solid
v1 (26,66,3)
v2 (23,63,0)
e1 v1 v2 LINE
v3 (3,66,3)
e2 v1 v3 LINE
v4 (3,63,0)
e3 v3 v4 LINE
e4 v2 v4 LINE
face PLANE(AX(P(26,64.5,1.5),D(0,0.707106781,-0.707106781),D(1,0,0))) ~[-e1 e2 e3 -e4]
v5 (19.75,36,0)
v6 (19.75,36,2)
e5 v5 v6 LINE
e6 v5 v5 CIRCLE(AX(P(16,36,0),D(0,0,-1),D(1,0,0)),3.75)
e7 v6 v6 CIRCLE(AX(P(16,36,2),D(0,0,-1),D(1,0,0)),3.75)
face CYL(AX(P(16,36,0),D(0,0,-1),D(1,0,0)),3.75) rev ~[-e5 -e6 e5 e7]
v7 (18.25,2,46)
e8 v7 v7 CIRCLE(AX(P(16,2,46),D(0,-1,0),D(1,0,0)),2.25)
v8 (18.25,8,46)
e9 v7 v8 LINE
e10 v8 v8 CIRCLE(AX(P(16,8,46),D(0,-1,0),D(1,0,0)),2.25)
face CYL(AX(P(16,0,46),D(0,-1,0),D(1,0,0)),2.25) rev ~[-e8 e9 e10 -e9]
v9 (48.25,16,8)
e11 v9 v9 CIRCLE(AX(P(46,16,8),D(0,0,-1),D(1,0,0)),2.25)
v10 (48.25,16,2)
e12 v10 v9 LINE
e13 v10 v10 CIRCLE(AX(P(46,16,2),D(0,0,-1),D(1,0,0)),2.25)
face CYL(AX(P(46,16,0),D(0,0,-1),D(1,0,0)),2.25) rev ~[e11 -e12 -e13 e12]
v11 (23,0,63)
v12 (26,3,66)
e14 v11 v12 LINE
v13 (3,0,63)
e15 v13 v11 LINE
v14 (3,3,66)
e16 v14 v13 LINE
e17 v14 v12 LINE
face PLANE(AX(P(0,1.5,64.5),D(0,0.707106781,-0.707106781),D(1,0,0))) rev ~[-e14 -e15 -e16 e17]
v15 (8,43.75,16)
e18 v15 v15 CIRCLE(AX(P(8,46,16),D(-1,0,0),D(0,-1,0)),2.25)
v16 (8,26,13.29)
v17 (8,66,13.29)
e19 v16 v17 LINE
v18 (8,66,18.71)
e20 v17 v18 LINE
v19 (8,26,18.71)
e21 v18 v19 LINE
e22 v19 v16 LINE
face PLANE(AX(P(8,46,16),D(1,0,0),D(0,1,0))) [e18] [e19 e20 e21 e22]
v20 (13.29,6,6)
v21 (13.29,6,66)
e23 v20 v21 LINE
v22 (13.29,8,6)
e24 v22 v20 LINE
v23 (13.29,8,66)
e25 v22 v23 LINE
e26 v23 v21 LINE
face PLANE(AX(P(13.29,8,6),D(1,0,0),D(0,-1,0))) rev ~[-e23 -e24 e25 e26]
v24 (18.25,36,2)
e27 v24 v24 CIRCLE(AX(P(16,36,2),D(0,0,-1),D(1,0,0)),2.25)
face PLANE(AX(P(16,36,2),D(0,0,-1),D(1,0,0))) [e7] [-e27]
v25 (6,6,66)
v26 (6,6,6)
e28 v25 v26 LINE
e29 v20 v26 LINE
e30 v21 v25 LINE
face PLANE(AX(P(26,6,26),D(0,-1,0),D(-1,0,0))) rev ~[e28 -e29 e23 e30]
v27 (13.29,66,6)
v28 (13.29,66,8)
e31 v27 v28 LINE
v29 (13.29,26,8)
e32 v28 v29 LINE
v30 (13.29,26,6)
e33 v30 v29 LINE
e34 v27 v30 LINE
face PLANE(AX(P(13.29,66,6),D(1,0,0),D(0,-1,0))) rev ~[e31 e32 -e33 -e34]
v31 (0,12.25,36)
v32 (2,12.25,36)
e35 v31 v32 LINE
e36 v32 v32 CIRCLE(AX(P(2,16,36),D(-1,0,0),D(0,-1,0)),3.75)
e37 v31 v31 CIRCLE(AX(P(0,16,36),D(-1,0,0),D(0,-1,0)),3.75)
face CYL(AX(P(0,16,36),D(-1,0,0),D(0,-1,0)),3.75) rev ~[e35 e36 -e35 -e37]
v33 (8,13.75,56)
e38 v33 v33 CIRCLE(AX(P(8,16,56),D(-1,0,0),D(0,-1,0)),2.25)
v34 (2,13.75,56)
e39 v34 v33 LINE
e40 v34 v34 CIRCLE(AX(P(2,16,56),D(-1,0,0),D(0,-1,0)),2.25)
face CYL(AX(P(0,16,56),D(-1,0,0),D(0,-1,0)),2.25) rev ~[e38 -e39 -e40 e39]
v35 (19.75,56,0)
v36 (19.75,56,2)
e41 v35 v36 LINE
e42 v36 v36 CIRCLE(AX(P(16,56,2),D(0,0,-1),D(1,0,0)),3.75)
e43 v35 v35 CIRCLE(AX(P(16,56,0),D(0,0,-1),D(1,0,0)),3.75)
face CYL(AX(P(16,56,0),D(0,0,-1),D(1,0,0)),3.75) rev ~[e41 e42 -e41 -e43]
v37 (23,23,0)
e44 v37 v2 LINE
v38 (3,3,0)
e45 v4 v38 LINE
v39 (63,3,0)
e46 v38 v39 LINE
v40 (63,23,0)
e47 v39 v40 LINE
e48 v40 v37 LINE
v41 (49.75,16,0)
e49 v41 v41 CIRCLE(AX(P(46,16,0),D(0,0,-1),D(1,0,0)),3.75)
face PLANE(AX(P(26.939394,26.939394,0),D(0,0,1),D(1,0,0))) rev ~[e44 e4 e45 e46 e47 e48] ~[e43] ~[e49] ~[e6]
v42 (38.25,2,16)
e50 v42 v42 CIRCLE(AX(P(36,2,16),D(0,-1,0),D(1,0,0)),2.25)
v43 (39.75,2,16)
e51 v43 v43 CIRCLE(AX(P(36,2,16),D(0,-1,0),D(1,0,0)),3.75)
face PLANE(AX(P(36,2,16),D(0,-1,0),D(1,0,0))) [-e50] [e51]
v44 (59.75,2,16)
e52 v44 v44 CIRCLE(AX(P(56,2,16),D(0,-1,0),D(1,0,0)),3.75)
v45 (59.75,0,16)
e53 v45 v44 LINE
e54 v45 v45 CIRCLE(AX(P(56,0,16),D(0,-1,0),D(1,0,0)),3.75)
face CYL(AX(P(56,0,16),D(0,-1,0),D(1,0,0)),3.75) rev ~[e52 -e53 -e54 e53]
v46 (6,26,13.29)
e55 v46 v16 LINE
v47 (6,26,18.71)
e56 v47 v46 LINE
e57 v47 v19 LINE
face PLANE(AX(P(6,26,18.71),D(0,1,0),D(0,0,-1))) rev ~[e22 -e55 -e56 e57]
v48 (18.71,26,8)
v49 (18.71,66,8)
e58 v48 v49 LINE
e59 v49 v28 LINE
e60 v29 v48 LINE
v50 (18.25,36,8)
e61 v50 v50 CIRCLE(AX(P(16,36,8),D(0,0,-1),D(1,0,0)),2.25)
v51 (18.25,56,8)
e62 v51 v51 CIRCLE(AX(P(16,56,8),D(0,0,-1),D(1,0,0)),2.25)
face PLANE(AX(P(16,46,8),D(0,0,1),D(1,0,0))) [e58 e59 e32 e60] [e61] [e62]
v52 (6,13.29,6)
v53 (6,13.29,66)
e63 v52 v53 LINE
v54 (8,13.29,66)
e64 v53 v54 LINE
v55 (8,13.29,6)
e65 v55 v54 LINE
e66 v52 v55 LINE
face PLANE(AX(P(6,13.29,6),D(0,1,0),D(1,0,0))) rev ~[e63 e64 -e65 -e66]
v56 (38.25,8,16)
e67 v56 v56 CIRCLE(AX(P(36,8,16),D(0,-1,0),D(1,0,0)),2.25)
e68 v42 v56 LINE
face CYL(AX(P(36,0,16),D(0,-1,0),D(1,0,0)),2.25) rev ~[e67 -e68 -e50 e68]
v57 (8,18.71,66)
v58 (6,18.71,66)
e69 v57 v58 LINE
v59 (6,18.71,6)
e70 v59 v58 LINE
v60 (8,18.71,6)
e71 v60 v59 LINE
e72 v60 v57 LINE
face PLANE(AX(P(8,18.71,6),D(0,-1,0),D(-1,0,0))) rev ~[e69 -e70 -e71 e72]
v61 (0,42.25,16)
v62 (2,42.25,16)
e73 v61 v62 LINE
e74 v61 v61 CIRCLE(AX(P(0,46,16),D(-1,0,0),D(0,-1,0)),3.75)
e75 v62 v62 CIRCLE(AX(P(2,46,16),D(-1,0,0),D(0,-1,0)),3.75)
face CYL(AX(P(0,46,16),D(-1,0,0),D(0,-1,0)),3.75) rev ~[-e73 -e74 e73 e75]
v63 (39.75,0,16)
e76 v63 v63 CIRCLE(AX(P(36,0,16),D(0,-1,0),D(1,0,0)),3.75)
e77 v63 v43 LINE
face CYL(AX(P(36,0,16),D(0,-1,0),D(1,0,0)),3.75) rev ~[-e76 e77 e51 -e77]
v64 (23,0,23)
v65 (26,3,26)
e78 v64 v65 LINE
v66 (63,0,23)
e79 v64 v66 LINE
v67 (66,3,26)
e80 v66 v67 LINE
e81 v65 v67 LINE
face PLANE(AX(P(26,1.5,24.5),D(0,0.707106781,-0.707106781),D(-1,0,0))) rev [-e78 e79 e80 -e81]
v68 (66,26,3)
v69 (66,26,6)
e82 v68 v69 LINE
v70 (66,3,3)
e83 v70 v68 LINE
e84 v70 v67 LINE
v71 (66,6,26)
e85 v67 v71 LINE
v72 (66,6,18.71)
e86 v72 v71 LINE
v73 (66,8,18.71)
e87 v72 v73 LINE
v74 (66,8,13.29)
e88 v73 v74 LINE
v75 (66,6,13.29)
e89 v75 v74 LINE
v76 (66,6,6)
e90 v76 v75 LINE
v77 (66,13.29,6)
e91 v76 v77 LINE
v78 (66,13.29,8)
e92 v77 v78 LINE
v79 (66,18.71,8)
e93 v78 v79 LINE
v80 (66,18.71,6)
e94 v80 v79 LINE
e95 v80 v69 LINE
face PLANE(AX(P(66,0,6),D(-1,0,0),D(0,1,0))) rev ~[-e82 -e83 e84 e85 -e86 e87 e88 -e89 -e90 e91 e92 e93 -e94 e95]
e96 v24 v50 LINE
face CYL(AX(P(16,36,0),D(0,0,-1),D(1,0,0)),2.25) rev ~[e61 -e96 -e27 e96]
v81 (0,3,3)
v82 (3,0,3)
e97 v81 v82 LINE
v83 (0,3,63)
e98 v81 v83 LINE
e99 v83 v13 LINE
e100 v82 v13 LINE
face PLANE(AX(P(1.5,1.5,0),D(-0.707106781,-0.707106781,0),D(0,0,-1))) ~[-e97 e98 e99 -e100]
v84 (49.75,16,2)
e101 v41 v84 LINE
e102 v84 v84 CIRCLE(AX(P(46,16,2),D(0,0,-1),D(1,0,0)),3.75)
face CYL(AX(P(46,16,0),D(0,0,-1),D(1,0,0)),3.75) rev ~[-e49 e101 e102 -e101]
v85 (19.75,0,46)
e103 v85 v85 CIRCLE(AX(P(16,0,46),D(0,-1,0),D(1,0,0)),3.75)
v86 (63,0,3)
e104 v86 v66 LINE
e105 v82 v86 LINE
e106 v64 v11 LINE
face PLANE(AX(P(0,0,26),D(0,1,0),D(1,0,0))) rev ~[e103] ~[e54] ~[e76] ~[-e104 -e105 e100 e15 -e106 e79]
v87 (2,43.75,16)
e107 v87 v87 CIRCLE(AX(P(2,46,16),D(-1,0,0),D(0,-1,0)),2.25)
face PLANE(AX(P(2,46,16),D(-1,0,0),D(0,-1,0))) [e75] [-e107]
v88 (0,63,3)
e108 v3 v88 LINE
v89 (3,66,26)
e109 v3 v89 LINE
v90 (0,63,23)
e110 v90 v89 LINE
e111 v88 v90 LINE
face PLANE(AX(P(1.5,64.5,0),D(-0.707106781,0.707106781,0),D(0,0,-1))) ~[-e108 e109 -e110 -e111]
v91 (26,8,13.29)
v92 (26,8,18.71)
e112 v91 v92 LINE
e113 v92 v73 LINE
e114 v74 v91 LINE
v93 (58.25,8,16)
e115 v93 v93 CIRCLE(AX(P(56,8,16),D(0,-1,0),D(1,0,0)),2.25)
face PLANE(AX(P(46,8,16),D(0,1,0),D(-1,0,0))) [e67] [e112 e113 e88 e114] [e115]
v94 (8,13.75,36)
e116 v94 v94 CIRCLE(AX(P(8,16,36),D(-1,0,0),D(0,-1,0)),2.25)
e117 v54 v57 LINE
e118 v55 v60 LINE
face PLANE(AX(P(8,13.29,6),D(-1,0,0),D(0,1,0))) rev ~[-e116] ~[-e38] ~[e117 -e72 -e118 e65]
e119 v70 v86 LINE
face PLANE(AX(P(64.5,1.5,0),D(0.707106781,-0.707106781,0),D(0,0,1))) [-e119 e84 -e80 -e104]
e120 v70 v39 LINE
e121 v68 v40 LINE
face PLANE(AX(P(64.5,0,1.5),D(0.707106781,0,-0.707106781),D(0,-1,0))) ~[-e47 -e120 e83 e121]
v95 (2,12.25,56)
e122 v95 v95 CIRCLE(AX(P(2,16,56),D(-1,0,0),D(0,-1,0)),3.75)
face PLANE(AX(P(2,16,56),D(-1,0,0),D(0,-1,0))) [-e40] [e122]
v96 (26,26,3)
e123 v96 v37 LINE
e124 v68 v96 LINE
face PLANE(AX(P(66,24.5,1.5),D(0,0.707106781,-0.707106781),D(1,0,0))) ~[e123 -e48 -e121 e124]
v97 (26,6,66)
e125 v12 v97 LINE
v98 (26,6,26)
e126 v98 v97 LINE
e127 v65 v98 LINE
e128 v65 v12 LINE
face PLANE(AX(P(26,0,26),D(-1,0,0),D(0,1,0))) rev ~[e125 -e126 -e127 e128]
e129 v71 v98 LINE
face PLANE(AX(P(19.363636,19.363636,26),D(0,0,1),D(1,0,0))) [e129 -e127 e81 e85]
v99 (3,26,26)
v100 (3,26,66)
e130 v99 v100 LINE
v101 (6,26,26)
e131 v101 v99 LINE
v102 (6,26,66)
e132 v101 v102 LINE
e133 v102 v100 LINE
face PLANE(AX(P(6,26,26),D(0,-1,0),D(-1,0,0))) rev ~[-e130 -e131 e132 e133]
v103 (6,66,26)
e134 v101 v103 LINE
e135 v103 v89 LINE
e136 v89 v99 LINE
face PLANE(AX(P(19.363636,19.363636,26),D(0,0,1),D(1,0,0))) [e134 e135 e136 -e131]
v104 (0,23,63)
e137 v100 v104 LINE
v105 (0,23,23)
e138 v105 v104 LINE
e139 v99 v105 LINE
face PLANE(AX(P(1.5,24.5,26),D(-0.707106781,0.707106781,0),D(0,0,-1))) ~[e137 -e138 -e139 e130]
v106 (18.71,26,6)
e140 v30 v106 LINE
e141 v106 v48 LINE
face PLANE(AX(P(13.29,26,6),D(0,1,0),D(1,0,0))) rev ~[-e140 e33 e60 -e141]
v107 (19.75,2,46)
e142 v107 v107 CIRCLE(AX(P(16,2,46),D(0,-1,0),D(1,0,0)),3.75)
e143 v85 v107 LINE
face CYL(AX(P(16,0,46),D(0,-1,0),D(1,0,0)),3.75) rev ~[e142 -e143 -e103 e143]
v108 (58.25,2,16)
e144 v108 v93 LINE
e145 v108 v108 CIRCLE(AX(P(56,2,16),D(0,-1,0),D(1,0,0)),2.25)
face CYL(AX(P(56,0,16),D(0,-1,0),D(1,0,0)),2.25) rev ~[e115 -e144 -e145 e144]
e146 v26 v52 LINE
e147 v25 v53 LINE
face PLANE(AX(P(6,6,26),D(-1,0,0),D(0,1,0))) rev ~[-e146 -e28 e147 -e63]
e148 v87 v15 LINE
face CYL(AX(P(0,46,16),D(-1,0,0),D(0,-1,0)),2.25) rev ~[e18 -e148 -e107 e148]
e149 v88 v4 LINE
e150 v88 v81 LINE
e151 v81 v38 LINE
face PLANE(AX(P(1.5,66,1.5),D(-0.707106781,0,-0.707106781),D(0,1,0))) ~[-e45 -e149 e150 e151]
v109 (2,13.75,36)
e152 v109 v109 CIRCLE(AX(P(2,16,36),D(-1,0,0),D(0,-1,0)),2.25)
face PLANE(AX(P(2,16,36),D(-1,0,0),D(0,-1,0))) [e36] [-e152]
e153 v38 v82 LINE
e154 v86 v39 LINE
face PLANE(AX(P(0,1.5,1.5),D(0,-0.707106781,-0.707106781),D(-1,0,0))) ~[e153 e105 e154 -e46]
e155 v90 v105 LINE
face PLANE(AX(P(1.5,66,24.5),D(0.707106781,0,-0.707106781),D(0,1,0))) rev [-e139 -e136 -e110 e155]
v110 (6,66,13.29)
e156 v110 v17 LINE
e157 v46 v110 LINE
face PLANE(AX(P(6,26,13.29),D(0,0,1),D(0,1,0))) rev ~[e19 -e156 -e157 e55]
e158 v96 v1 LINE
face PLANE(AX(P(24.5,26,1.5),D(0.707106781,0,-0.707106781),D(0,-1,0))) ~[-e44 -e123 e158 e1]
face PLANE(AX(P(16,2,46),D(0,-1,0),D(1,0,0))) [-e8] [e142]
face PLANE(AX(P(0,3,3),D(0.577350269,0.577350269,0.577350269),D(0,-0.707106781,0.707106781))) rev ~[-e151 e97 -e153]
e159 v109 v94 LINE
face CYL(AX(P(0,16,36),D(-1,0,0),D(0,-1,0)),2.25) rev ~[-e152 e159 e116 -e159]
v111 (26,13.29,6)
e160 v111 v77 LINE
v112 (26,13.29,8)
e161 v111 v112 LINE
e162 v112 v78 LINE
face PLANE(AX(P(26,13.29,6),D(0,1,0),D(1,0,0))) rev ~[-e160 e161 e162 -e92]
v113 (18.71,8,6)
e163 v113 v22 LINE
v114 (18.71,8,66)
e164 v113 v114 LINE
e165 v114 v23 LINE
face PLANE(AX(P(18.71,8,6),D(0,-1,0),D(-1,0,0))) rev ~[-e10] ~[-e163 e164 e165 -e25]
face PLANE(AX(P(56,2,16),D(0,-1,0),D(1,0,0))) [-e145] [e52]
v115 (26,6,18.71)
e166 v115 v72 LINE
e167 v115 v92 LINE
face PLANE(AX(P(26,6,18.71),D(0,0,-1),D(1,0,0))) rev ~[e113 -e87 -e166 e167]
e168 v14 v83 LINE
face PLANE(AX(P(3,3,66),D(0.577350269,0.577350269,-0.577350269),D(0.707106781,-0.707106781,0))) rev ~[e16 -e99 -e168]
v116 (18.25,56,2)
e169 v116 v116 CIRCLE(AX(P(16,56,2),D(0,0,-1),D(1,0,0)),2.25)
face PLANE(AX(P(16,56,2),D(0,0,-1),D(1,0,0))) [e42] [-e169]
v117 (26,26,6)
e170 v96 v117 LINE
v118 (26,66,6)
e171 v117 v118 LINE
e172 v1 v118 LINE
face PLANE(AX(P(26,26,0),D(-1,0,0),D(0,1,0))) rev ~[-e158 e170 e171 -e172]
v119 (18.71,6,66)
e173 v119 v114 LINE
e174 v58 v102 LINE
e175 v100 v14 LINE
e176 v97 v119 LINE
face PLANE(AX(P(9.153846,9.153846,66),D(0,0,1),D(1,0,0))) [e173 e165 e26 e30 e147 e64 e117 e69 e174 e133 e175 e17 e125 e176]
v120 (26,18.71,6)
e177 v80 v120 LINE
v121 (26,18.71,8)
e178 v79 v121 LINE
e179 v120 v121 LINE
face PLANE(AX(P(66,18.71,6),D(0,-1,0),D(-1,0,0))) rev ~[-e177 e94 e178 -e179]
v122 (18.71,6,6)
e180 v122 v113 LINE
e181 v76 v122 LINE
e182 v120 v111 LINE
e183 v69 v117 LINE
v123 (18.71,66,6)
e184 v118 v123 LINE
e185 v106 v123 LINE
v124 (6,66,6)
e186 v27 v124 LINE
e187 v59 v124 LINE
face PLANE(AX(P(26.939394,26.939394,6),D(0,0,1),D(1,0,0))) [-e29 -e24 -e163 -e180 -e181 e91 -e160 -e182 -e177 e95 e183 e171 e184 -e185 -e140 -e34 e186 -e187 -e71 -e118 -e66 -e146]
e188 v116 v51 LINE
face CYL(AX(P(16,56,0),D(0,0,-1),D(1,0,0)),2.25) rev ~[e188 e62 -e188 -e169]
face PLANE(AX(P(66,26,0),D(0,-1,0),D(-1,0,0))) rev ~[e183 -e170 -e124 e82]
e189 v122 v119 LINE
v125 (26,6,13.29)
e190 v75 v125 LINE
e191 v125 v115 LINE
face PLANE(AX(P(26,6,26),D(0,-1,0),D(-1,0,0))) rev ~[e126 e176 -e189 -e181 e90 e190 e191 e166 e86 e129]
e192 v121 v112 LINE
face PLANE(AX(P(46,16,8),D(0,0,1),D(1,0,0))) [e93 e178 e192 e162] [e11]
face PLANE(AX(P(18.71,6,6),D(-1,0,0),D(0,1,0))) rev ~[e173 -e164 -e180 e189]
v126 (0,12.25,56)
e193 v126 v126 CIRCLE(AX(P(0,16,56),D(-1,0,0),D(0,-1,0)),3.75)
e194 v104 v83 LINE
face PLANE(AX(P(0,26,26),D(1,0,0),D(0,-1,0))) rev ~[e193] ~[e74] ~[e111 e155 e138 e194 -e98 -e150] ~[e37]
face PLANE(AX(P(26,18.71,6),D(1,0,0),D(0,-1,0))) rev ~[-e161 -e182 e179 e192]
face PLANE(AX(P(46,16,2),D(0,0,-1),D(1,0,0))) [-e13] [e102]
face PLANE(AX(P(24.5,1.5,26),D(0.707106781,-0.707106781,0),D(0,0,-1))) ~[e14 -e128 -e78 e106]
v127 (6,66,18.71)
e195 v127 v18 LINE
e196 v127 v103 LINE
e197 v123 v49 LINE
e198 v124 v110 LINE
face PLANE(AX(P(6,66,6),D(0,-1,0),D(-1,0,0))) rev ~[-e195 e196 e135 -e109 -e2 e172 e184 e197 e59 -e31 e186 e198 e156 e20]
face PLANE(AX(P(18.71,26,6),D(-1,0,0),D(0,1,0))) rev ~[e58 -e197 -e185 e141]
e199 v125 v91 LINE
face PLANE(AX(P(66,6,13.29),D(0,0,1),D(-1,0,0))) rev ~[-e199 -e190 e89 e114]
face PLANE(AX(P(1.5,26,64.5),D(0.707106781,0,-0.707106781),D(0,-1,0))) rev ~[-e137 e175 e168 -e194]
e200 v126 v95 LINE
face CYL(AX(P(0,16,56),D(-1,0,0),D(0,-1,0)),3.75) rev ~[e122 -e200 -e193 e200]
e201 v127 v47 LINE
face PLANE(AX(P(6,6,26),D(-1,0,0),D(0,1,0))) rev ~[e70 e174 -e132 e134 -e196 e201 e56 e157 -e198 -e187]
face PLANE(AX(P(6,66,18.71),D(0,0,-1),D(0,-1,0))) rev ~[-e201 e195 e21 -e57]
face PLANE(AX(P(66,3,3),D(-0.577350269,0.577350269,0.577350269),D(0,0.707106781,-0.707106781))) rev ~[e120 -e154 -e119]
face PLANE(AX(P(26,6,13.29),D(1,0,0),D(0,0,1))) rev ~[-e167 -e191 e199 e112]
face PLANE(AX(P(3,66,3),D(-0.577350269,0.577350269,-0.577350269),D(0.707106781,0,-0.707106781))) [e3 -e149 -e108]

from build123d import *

# Parameters (mm, degrees)
F1_DEPTH  = 6
F3_DEPTH  = 20
F5_DEPTH  = 40
F7_DEPTH  = 60
F9_DEPTH  = 2
F11_DEPTH = 2
F13_DEPTH = 2
F14_R     = 2.25
F15_DEPTH = 8
F16_R     = 2.25
F17_DEPTH = 8
F18_R     = 2.25
F19_DEPTH = 8
F20_R     = 3.75
F21_DEPTH = 2
F22_R     = 3.75
F23_DEPTH = 2
F24_R     = 3.75
F25_DEPTH = 2
F26_SIZE  = 3


with BuildPart() as f1:
    # F0 (on Top) → F1 (new body)
    with BuildSketch(Plane.XY):
        Polygon((0, 66), (0, 0), (66, 0), (66, 26), (26, 26), (26, 66), align=None)
    extrude(amount=F1_DEPTH)

    # F2 (on face) → F3 (join)
    with BuildSketch(Plane.XY.offset(6)):
        Polygon((6, 66), (0, 66), (0, 0), (66, 0), (66, 6), (6, 6), align=None)
    extrude(amount=F3_DEPTH)

    # F4 (on face) → F5 (join)
    with BuildSketch(Plane.XY.offset(26)):
        Polygon((6, 6), (6, 26), (0, 26), (0, 0), (26, 0), (26, 6), align=None)
    extrude(amount=F5_DEPTH)

    # F6 (on face) → F7 (join)
    with BuildSketch(Plane.XY.offset(6)):
        Polygon((13.29, 6), (16, 6), (18.71, 6), (18.71, 8), (13.29, 8), align=None)
        Polygon((6, 18.71), (6, 16), (6, 13.29), (8, 13.29), (8, 18.71), align=None)
    extrude(amount=F7_DEPTH)

    # F8 (on face) → F9 (join)
    with BuildSketch(Plane.XY.offset(6)):
        Polygon((66, 13.29), (66, 16), (66, 18.71), (26, 18.71), (26, 13.29), align=None)
        Polygon((18.71, 66), (16, 66), (13.29, 66), (13.29, 26), (18.71, 26), align=None)
    extrude(amount=F9_DEPTH)

    # F10 (on face) → F11 (join)
    with BuildSketch(Plane(origin=(0, 6, 0), x_dir=(-1, 0, 0), z_dir=(0, 1, 0))):
        Polygon((-66, 18.71), (-66, 16), (-66, 13.29), (-26, 13.29), (-26, 16), (-26, 18.71), align=None)
    extrude(amount=F11_DEPTH)

    # F12 (on face) → F13 (join)
    with BuildSketch(Plane.YZ.offset(6)):
        Polygon((66, 13.29), (66, 16), (66, 18.71), (26, 18.71), (26, 13.29), align=None)
    extrude(amount=F13_DEPTH)

    # F14 (on face) → F15 (cut, through all)
    with BuildSketch(Plane.XZ):
        with Locations((56, 16)):
            Circle(F14_R)
        with Locations((16, 46)):
            Circle(F14_R)
        with Locations((36, 16)):
            Circle(F14_R)
    extrude(amount=-F15_DEPTH, mode=Mode.SUBTRACT)

    # F16 (on face) → F17 (cut, through all)
    with BuildSketch(Plane(origin=(0, 0, 0), x_dir=(0, -1, 0), z_dir=(-1, 0, 0))):
        with Locations((-16, 56)):
            Circle(F16_R)
        with Locations((-46, 16)):
            Circle(F16_R)
        with Locations((-16, 36)):
            Circle(F16_R)
    extrude(amount=-F17_DEPTH, mode=Mode.SUBTRACT)

    # F18 (on face) → F19 (cut, through all)
    with BuildSketch(Plane(origin=(0, 0, 0), x_dir=(1, 0, 0), z_dir=(0, 0, -1))):
        with Locations((46, -16)):
            Circle(F18_R)
        with Locations((16, -56)):
            Circle(F18_R)
        with Locations((16, -36)):
            Circle(F18_R)
    extrude(amount=-F19_DEPTH, mode=Mode.SUBTRACT)

    # F20 (on face) → F21 (cut)
    with BuildSketch(Plane.XZ):
        with Locations((16, 46)):
            Circle(F20_R)
        with Locations((36, 16)):
            Circle(F20_R)
        with Locations((56, 16)):
            Circle(F20_R)
    extrude(amount=-F21_DEPTH, mode=Mode.SUBTRACT)

    # F22 (on face) → F23 (cut)
    with BuildSketch(Plane(origin=(0, 0, 0), x_dir=(0, -1, 0), z_dir=(-1, 0, 0))):
        with Locations((-16, 56)):
            Circle(F22_R)
        with Locations((-46, 16)):
            Circle(F22_R)
        with Locations((-16, 36)):
            Circle(F22_R)
    extrude(amount=-F23_DEPTH, mode=Mode.SUBTRACT)

    # F24 (on face) → F25 (cut)
    with BuildSketch(Plane(origin=(0, 0, 0), x_dir=(1, 0, 0), z_dir=(0, 0, -1))):
        with Locations((16, -56)):
            Circle(F24_R)
        with Locations((46, -16)):
            Circle(F24_R)
        with Locations((16, -36)):
            Circle(F24_R)
    extrude(amount=-F25_DEPTH, mode=Mode.SUBTRACT)

    # F26
    f26_edges = [f1.edges().sort_by_distance(p)[0] for p in [
        (33, 0, 0),
        (0, 33, 0),
        (0, 0, 33),
        (0, 26, 46),
        (0, 46, 26),
        (26, 0, 46),
        (46, 0, 26),
        (0, 13, 66),
        (13, 0, 66),
        (0, 66, 13),
        (13, 66, 0),
        (66, 0, 13),
        (66, 13, 0),
        (46, 26, 0),
        (26, 46, 0),
    ]]
    chamfer(f26_edges, length=F26_SIZE)


solid = f1.part
